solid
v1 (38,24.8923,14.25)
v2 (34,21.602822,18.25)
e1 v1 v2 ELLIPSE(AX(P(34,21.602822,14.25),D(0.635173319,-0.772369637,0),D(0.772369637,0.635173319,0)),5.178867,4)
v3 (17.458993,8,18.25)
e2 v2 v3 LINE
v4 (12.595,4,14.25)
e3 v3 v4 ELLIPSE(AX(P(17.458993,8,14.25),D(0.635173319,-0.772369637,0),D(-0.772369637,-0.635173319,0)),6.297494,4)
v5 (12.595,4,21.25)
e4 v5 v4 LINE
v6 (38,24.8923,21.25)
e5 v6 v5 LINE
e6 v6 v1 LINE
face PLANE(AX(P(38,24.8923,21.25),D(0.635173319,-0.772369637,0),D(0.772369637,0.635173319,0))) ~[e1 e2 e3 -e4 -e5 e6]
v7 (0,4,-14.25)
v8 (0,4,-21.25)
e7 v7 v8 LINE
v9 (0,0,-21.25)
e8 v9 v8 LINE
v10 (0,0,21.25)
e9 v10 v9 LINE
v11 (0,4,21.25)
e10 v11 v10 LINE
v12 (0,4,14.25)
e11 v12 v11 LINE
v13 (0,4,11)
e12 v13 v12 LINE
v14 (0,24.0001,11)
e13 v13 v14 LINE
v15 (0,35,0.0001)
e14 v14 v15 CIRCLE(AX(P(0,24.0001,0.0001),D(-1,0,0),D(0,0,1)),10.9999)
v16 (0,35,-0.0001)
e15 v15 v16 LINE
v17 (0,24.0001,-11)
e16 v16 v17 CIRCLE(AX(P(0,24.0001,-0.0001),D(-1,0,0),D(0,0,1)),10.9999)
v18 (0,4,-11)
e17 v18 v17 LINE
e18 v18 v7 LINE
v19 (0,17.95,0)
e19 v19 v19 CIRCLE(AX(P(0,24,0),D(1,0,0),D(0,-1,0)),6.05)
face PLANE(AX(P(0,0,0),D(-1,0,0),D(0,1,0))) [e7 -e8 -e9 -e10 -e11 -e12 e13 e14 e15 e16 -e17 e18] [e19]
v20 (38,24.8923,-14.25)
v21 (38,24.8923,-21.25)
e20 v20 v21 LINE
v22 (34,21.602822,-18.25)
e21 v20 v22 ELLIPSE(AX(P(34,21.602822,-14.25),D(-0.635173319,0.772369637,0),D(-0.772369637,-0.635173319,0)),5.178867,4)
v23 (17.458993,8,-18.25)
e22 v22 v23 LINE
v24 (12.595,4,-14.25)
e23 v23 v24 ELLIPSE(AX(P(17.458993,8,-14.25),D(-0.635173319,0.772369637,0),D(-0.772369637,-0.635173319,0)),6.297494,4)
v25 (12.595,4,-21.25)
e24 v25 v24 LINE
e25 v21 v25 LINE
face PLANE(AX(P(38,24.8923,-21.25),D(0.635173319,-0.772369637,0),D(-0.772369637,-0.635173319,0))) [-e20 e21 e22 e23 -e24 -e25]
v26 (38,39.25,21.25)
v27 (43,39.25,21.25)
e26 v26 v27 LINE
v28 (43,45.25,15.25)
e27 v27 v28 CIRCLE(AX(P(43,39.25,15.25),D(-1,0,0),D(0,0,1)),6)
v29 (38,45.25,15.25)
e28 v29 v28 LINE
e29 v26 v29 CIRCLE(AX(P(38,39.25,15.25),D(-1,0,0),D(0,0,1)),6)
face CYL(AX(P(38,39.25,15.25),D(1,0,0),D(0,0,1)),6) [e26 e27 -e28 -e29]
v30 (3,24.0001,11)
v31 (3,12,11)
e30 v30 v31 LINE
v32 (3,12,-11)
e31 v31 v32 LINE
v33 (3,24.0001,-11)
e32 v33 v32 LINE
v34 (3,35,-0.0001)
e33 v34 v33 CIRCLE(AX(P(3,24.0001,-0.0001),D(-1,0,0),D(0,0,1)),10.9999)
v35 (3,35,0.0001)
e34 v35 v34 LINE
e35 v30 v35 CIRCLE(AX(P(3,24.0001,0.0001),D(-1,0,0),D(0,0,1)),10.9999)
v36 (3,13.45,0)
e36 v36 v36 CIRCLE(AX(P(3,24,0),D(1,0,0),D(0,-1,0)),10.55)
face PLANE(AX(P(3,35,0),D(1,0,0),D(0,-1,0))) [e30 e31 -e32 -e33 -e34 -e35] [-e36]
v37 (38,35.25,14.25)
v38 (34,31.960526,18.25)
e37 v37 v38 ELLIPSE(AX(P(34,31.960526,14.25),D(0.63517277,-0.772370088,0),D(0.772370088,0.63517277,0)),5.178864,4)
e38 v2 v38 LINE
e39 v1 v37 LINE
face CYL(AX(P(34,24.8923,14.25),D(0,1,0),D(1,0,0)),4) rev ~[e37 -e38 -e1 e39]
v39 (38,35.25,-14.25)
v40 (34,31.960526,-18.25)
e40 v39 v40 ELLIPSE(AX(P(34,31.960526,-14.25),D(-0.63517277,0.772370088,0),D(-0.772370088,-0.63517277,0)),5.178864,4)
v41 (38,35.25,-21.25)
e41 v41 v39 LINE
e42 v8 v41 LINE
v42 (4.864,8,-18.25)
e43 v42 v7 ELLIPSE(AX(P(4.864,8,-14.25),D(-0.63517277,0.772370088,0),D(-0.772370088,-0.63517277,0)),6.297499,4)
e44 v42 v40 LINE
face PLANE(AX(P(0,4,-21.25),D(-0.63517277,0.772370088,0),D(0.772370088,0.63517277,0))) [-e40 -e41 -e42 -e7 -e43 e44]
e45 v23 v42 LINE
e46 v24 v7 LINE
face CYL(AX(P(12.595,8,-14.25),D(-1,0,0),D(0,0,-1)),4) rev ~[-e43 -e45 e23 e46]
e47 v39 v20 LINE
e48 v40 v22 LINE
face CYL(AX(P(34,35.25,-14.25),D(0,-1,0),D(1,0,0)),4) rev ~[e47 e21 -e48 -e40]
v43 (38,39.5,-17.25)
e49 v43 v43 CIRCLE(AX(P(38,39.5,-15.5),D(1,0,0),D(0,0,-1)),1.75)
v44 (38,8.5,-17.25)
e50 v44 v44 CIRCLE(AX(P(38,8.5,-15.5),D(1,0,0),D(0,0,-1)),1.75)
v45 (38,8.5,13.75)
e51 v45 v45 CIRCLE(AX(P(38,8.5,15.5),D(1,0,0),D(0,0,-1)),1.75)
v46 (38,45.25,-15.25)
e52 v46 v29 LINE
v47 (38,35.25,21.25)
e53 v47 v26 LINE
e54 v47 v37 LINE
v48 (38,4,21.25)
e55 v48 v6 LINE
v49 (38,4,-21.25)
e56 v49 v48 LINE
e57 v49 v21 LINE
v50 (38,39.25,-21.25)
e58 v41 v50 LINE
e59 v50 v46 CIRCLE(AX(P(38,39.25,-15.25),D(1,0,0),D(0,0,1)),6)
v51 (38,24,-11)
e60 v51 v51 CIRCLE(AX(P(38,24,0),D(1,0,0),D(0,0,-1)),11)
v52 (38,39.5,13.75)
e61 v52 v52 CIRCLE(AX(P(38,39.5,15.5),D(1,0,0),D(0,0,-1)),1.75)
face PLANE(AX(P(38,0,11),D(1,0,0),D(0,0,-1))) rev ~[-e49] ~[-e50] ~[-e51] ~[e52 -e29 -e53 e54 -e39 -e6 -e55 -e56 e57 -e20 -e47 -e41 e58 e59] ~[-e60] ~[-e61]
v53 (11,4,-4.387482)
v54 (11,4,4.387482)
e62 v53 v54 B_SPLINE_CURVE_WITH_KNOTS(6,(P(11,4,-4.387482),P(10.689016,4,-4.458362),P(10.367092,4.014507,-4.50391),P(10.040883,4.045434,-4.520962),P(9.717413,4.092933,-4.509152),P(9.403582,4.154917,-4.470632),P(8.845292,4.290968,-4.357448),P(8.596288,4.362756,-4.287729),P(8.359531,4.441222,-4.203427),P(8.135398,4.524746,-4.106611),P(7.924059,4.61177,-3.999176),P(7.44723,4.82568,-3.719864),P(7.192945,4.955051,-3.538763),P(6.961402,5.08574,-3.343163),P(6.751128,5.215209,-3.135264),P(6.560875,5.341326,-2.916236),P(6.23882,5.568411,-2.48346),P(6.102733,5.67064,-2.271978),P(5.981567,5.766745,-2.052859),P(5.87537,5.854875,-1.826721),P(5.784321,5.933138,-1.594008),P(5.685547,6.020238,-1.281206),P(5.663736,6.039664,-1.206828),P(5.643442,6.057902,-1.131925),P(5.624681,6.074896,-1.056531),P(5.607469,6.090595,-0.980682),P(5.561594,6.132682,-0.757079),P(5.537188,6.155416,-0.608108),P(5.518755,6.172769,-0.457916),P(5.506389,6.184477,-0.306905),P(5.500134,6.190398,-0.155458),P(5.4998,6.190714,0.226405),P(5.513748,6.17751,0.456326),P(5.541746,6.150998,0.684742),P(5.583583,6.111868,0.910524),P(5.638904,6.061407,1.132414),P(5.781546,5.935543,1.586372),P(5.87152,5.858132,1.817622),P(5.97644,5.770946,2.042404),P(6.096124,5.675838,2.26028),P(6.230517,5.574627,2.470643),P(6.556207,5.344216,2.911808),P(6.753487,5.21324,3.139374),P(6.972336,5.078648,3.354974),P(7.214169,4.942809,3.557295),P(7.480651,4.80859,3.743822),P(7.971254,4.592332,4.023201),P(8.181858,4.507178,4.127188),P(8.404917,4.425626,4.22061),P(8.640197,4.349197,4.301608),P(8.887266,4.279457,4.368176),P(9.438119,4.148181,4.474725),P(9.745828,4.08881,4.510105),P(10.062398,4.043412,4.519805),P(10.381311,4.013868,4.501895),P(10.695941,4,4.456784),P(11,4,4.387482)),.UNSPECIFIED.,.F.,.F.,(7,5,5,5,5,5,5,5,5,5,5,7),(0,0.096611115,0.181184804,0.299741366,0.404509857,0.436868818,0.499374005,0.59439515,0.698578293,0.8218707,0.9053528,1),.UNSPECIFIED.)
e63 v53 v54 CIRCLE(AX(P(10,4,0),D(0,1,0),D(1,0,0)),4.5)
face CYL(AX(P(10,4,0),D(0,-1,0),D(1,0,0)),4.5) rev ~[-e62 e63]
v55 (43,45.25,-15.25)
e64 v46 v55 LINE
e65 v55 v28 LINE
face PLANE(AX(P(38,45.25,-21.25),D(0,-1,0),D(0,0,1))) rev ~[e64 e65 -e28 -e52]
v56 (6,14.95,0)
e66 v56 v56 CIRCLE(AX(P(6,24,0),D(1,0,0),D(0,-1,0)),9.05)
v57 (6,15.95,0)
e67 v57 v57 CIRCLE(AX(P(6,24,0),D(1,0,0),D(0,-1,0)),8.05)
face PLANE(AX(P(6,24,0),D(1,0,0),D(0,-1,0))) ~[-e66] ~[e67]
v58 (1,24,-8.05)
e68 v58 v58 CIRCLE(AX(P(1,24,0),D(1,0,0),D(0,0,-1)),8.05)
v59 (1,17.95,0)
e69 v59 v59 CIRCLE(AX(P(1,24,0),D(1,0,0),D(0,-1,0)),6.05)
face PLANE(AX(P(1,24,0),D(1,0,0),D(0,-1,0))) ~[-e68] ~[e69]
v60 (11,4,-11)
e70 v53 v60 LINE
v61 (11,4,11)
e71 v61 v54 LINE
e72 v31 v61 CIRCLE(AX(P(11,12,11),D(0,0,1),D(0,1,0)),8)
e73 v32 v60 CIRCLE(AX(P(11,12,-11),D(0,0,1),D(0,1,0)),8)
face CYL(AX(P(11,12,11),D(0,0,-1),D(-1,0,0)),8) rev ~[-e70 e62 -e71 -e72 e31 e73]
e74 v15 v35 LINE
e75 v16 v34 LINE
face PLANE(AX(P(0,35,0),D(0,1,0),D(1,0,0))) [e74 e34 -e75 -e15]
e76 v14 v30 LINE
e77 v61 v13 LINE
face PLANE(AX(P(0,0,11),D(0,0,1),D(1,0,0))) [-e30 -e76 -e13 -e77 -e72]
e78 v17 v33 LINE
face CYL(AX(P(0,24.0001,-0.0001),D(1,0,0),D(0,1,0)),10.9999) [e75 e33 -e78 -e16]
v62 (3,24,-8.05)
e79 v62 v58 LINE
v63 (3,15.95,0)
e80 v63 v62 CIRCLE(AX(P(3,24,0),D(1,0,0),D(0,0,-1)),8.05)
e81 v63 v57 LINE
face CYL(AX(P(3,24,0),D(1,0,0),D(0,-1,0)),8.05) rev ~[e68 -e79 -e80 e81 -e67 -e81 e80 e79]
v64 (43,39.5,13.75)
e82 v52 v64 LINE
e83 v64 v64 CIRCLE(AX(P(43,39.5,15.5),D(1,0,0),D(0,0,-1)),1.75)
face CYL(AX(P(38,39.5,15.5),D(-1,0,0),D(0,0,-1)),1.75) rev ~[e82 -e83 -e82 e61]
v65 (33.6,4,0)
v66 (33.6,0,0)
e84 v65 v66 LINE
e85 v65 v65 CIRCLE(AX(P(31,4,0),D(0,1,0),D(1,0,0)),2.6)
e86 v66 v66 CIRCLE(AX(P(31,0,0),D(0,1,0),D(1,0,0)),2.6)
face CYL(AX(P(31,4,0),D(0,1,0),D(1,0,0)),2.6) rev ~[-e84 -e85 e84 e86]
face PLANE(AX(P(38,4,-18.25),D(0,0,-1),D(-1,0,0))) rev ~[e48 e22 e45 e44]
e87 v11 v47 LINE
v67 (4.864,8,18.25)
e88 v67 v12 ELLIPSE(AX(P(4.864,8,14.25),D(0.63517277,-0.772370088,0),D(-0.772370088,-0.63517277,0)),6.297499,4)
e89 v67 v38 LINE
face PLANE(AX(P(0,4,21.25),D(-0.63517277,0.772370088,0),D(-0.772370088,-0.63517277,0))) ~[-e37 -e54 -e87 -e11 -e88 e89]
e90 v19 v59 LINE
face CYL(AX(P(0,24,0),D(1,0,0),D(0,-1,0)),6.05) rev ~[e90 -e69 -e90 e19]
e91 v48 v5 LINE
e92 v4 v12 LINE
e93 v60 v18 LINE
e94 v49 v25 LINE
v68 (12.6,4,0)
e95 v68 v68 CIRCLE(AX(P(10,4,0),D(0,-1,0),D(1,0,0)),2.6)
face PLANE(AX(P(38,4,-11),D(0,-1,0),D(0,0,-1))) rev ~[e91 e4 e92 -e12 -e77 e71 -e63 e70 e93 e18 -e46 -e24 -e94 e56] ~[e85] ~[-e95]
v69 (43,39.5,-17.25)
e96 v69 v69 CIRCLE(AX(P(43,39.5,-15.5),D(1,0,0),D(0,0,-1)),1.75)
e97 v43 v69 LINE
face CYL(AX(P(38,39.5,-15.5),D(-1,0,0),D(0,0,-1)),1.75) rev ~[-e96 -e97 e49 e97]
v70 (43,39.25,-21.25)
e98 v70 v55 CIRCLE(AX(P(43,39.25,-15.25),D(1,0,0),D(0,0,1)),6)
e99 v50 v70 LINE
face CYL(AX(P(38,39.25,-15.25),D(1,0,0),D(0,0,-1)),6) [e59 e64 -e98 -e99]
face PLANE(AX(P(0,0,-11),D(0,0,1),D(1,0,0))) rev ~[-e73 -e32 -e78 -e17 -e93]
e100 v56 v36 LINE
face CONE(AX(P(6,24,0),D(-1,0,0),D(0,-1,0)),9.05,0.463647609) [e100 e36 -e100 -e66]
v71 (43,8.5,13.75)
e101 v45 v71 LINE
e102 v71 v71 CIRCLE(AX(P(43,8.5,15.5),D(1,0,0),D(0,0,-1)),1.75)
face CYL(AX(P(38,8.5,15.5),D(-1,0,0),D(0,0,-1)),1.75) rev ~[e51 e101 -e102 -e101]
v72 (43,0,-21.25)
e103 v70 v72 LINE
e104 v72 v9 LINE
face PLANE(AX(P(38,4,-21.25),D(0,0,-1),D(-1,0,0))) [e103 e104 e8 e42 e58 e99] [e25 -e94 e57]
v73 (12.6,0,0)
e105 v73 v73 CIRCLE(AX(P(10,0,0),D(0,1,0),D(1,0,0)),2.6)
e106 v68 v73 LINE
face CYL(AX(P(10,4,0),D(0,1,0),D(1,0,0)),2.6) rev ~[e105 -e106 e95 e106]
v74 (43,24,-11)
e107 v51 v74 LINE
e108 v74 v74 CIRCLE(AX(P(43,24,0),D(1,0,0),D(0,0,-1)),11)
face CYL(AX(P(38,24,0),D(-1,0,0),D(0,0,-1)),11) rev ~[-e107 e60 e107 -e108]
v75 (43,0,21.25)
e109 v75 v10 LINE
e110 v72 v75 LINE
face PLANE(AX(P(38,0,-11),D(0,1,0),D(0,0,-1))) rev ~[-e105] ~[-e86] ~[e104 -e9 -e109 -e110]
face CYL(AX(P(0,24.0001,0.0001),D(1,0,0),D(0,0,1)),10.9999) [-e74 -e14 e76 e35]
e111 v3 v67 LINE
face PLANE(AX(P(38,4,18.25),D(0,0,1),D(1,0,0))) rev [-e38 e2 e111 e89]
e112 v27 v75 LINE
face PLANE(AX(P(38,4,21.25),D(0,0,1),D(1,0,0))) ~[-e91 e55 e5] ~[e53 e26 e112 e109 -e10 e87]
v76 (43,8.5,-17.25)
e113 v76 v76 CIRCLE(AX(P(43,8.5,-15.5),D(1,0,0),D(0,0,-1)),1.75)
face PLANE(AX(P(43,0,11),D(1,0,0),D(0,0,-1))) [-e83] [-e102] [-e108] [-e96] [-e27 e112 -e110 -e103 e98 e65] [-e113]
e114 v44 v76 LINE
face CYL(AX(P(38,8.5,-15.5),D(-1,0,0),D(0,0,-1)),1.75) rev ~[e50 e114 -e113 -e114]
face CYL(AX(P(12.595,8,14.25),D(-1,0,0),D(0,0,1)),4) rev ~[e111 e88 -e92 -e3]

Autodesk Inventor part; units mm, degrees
ref_plane "YZ Plane" through (0, 0, 0) normal (1, 0, 0) x (0, 1, 0)
ref_plane "XZ Plane" through (0, 0, 0) normal (0, 1, 0) x (-1, 0, 0)
ref_plane "XY Plane" through (0, 0, 0) normal (0, 0, 1) x (1, 0, 0)
sketch "Sketch3" plane through (0, 0, 0) normal (0, 0, 1) x (1, 0, 0)
  line L0 (0, 0) -> (0, 35)
  line L1 (0, 35) -> (3, 35)
  line L2 (3, 35) -> (3, 4)
  line L3 (3, 4) -> (38, 4)
  line L4 (38, 4) -> (38, 0)
  line L5 (38, 0) -> (0, 0)
  line L6 (0, 25) -> (3, 25) construction
  dimension "d0" = 10
  dimension "d1" = 25
  dimension "d2" = 35
  dimension "d3" = 4
  dimension "d4" = 3
extrude "Extrusion1" add sketch "Sketch3" along normal mid plane 22
sketch "Sketch4" plane through (3, 4, -11) normal (1, 0, 0) x (0, 0, -1)
  line L0 (0, 31) -> (-22, 31) construction
  line L1 (-11, 31) -> (-11, 20) construction
  circle A0 centre (-11, 20) radius 8.05
  point P0 (-11, -4)
  dimension "d7" = 11
  dimension "d8" = 16.1
extrude "Extrusion2" cut sketch "Sketch4" against normal through all
fillet "Fillet3" radius 8 1 edges at (3, 4, 0)
sketch "Sketch5" plane through (3, 4, -11) normal (0, 1, 0) x (1, 0, 0)
  line L0 (35, 0) -> (35, -22) construction
  line L1 (35, -11) -> (0, -11) construction
  line L2 (0, 0) -> (0, -22) construction
  circle A0 centre (7, -11) radius 2.6
  circle A1 centre (28, -11) radius 2.6
  point P0 (-3, -11)
  dimension "d11" = 7
  dimension "d12" = 7
  dimension "d13" = 5.2
extrude "Extrusion3" cut sketch "Sketch5" along normal mid plane 24.75
sketch "Sketch6" plane through (0, 0, 0) normal (0, 0, 1) x (1, 0, 0)
  line L0 (3, 15.95) -> (0, 15.95) construction
  line L1 (0, 15.95) -> (0, 17.95)
  line L2 (0, 17.95) -> (1, 17.95)
  line L3 (1, 17.95) -> (1, 15.95)
  line L4 (0, 15.95) -> (0, 32.05) construction
  line L5 (1, 15.95) -> (0, 15.95)
  line L6 (3, 32.05) -> (3, 15.95) construction
  line L7 (3, 15.95) -> (6, 15.95)
  line L8 (6, 15.95) -> (6, 14.95)
  line L9 (6, 14.95) -> (3, 13.45)
  line L10 (3, 13.45) -> (3, 15.95)
  line L11 (0, 24) -> (3, 24) construction
  point P0 (0, 0)
  dimension "d16" = 1
  dimension "d17" = 2
  dimension "d18" = 5
  dimension "d19" = 2.5
  dimension "d20" = 1
revolve "Revolution1" add sketch "Sketch6" angle 360 about axis through (0, 24, 0) along (1, 0, 0)
fillet "Fillet1" radius 11 2 edges at (1.5, 35, 11) (1.5, 35, -11)
sketch "Sketch7" plane through (38, 0, 11) normal (1, 0, 0) x (0, 0, -1)
  circle A0 centre (11, 24) radius 6.05 construction
  line L0 (-10.25, 2.75) -> (32.25, 2.75) construction
  line L1 (32.25, 2.75) -> (32.25, 45.25)
  line L2 (32.25, 45.25) -> (-10.25, 45.25)
  line L3 (-10.25, 45.25) -> (-10.25, 2.75)
  line L4 (-10.25, 2.75) -> (32.25, 45.25) construction
  line L5 (32.25, 2.75) -> (-10.25, 45.25) construction
  line L6 (-10.25, 2.75) -> (-10.25, 0)
  line L7 (-10.25, 0) -> (32.25, 0)
  line L8 (32.25, 0) -> (32.25, 2.75)
  line L9 (22, 0) -> (0, 0) projected
  circle A1 centre (11, 24) radius 11
  line L10 (26.5, 8.5) -> (-4.5, 8.5) construction
  line L11 (-4.5, 8.5) -> (-4.5, 39.5) construction
  line L12 (-4.5, 39.5) -> (26.5, 39.5) construction
  line L13 (26.5, 39.5) -> (26.5, 8.5) construction
  line L14 (26.5, 8.5) -> (-4.5, 39.5) construction
  line L15 (-4.5, 8.5) -> (26.5, 39.5) construction
  circle A2 centre (-4.5, 39.5) radius 1.75
  circle A3 centre (-4.5, 8.5) radius 1.75
  circle A4 centre (26.5, 8.5) radius 1.75
  circle A5 centre (26.5, 39.5) radius 1.75
  point P0 (11, 0)
  point P1 (11, 0)
  dimension "d23" = 42.5
  dimension "d24" = 22
  dimension "d25" = 31
  dimension "d26" = 3.5
extrude "Extrusion4" add sketch "Sketch7" along normal blind 5
sketch "Sketch8" plane through (38, 0, 11) normal (-1, 0, 0) x (0, 0, 1)
  line L0 (10.25, 0) -> (0, 0)
  line L1 (0, 0) -> (0, 4)
  line L2 (0, 4) -> (10.25, 4)
  line L3 (10.25, 4) -> (10.25, 0)
  line L4 (-22, 4) -> (-22, 0) projected
  line L5 (-32.25, 0) -> (-32.25, 45.25) projected
  line L6 (-22, 4) -> (-32.25, 4)
  line L7 (-32.25, 4) -> (-32.25, 0)
  line L8 (-32.25, 0) -> (-22, 0)
  line L9 (-22, 0) -> (-22, 4)
  point P0 (-11, 0)
extrude "Extrusion5" add sketch "Sketch8" along normal up to surface (38 mm away)
sketch "Sketch9" plane through (38, 4, -21.25) normal (0, 0, -1) x (-1, 0, 0)
  line L0 (0, 9) -> (0, 31) projected
  line L1 (0, 20.8923) -> (25.405, 0)
  line L2 (0, 0) -> (38, 0) projected
  line L3 (38, 0) -> (0, 31.25)
  line L4 (0, 0) -> (0, 41.25) projected
  point P0 (38, -4)
  point P1 (0, 28)
  dimension "d31" = 8
  dimension "d40" = 10
extrude "Extrusion6" add sketch "Sketch9" against normal blind 3 contours L0 L4 L3 L2 L1
fillet "Fillet2" radius 4 2 edges at (38, 30.0711, -18.25) (6.2975, 4, -18.25)
mirror "Mirror1" about plane through (0, 0, 0) normal (0, 0, 1) of "Extrusion6", "Fillet2"
sketch "Sketch10" plane through (0, 4, -11) normal (0, 1, 0) x (1, 0, 0)
  circle A0 centre (10, -11) radius 2.6 projected
  circle A1 centre (10, -11) radius 4.5
  point P0 (0, -11)
  dimension "d37" = 9
extrude "Extrusion7" cut sketch "Sketch10" along normal blind 7 contours A0 | A1
fillet "Fillet4" radius 6 2 edges at (40.5, 45.25, 21.25) (40.5, 45.25, -21.25)
properties part number "Winder_driver"
